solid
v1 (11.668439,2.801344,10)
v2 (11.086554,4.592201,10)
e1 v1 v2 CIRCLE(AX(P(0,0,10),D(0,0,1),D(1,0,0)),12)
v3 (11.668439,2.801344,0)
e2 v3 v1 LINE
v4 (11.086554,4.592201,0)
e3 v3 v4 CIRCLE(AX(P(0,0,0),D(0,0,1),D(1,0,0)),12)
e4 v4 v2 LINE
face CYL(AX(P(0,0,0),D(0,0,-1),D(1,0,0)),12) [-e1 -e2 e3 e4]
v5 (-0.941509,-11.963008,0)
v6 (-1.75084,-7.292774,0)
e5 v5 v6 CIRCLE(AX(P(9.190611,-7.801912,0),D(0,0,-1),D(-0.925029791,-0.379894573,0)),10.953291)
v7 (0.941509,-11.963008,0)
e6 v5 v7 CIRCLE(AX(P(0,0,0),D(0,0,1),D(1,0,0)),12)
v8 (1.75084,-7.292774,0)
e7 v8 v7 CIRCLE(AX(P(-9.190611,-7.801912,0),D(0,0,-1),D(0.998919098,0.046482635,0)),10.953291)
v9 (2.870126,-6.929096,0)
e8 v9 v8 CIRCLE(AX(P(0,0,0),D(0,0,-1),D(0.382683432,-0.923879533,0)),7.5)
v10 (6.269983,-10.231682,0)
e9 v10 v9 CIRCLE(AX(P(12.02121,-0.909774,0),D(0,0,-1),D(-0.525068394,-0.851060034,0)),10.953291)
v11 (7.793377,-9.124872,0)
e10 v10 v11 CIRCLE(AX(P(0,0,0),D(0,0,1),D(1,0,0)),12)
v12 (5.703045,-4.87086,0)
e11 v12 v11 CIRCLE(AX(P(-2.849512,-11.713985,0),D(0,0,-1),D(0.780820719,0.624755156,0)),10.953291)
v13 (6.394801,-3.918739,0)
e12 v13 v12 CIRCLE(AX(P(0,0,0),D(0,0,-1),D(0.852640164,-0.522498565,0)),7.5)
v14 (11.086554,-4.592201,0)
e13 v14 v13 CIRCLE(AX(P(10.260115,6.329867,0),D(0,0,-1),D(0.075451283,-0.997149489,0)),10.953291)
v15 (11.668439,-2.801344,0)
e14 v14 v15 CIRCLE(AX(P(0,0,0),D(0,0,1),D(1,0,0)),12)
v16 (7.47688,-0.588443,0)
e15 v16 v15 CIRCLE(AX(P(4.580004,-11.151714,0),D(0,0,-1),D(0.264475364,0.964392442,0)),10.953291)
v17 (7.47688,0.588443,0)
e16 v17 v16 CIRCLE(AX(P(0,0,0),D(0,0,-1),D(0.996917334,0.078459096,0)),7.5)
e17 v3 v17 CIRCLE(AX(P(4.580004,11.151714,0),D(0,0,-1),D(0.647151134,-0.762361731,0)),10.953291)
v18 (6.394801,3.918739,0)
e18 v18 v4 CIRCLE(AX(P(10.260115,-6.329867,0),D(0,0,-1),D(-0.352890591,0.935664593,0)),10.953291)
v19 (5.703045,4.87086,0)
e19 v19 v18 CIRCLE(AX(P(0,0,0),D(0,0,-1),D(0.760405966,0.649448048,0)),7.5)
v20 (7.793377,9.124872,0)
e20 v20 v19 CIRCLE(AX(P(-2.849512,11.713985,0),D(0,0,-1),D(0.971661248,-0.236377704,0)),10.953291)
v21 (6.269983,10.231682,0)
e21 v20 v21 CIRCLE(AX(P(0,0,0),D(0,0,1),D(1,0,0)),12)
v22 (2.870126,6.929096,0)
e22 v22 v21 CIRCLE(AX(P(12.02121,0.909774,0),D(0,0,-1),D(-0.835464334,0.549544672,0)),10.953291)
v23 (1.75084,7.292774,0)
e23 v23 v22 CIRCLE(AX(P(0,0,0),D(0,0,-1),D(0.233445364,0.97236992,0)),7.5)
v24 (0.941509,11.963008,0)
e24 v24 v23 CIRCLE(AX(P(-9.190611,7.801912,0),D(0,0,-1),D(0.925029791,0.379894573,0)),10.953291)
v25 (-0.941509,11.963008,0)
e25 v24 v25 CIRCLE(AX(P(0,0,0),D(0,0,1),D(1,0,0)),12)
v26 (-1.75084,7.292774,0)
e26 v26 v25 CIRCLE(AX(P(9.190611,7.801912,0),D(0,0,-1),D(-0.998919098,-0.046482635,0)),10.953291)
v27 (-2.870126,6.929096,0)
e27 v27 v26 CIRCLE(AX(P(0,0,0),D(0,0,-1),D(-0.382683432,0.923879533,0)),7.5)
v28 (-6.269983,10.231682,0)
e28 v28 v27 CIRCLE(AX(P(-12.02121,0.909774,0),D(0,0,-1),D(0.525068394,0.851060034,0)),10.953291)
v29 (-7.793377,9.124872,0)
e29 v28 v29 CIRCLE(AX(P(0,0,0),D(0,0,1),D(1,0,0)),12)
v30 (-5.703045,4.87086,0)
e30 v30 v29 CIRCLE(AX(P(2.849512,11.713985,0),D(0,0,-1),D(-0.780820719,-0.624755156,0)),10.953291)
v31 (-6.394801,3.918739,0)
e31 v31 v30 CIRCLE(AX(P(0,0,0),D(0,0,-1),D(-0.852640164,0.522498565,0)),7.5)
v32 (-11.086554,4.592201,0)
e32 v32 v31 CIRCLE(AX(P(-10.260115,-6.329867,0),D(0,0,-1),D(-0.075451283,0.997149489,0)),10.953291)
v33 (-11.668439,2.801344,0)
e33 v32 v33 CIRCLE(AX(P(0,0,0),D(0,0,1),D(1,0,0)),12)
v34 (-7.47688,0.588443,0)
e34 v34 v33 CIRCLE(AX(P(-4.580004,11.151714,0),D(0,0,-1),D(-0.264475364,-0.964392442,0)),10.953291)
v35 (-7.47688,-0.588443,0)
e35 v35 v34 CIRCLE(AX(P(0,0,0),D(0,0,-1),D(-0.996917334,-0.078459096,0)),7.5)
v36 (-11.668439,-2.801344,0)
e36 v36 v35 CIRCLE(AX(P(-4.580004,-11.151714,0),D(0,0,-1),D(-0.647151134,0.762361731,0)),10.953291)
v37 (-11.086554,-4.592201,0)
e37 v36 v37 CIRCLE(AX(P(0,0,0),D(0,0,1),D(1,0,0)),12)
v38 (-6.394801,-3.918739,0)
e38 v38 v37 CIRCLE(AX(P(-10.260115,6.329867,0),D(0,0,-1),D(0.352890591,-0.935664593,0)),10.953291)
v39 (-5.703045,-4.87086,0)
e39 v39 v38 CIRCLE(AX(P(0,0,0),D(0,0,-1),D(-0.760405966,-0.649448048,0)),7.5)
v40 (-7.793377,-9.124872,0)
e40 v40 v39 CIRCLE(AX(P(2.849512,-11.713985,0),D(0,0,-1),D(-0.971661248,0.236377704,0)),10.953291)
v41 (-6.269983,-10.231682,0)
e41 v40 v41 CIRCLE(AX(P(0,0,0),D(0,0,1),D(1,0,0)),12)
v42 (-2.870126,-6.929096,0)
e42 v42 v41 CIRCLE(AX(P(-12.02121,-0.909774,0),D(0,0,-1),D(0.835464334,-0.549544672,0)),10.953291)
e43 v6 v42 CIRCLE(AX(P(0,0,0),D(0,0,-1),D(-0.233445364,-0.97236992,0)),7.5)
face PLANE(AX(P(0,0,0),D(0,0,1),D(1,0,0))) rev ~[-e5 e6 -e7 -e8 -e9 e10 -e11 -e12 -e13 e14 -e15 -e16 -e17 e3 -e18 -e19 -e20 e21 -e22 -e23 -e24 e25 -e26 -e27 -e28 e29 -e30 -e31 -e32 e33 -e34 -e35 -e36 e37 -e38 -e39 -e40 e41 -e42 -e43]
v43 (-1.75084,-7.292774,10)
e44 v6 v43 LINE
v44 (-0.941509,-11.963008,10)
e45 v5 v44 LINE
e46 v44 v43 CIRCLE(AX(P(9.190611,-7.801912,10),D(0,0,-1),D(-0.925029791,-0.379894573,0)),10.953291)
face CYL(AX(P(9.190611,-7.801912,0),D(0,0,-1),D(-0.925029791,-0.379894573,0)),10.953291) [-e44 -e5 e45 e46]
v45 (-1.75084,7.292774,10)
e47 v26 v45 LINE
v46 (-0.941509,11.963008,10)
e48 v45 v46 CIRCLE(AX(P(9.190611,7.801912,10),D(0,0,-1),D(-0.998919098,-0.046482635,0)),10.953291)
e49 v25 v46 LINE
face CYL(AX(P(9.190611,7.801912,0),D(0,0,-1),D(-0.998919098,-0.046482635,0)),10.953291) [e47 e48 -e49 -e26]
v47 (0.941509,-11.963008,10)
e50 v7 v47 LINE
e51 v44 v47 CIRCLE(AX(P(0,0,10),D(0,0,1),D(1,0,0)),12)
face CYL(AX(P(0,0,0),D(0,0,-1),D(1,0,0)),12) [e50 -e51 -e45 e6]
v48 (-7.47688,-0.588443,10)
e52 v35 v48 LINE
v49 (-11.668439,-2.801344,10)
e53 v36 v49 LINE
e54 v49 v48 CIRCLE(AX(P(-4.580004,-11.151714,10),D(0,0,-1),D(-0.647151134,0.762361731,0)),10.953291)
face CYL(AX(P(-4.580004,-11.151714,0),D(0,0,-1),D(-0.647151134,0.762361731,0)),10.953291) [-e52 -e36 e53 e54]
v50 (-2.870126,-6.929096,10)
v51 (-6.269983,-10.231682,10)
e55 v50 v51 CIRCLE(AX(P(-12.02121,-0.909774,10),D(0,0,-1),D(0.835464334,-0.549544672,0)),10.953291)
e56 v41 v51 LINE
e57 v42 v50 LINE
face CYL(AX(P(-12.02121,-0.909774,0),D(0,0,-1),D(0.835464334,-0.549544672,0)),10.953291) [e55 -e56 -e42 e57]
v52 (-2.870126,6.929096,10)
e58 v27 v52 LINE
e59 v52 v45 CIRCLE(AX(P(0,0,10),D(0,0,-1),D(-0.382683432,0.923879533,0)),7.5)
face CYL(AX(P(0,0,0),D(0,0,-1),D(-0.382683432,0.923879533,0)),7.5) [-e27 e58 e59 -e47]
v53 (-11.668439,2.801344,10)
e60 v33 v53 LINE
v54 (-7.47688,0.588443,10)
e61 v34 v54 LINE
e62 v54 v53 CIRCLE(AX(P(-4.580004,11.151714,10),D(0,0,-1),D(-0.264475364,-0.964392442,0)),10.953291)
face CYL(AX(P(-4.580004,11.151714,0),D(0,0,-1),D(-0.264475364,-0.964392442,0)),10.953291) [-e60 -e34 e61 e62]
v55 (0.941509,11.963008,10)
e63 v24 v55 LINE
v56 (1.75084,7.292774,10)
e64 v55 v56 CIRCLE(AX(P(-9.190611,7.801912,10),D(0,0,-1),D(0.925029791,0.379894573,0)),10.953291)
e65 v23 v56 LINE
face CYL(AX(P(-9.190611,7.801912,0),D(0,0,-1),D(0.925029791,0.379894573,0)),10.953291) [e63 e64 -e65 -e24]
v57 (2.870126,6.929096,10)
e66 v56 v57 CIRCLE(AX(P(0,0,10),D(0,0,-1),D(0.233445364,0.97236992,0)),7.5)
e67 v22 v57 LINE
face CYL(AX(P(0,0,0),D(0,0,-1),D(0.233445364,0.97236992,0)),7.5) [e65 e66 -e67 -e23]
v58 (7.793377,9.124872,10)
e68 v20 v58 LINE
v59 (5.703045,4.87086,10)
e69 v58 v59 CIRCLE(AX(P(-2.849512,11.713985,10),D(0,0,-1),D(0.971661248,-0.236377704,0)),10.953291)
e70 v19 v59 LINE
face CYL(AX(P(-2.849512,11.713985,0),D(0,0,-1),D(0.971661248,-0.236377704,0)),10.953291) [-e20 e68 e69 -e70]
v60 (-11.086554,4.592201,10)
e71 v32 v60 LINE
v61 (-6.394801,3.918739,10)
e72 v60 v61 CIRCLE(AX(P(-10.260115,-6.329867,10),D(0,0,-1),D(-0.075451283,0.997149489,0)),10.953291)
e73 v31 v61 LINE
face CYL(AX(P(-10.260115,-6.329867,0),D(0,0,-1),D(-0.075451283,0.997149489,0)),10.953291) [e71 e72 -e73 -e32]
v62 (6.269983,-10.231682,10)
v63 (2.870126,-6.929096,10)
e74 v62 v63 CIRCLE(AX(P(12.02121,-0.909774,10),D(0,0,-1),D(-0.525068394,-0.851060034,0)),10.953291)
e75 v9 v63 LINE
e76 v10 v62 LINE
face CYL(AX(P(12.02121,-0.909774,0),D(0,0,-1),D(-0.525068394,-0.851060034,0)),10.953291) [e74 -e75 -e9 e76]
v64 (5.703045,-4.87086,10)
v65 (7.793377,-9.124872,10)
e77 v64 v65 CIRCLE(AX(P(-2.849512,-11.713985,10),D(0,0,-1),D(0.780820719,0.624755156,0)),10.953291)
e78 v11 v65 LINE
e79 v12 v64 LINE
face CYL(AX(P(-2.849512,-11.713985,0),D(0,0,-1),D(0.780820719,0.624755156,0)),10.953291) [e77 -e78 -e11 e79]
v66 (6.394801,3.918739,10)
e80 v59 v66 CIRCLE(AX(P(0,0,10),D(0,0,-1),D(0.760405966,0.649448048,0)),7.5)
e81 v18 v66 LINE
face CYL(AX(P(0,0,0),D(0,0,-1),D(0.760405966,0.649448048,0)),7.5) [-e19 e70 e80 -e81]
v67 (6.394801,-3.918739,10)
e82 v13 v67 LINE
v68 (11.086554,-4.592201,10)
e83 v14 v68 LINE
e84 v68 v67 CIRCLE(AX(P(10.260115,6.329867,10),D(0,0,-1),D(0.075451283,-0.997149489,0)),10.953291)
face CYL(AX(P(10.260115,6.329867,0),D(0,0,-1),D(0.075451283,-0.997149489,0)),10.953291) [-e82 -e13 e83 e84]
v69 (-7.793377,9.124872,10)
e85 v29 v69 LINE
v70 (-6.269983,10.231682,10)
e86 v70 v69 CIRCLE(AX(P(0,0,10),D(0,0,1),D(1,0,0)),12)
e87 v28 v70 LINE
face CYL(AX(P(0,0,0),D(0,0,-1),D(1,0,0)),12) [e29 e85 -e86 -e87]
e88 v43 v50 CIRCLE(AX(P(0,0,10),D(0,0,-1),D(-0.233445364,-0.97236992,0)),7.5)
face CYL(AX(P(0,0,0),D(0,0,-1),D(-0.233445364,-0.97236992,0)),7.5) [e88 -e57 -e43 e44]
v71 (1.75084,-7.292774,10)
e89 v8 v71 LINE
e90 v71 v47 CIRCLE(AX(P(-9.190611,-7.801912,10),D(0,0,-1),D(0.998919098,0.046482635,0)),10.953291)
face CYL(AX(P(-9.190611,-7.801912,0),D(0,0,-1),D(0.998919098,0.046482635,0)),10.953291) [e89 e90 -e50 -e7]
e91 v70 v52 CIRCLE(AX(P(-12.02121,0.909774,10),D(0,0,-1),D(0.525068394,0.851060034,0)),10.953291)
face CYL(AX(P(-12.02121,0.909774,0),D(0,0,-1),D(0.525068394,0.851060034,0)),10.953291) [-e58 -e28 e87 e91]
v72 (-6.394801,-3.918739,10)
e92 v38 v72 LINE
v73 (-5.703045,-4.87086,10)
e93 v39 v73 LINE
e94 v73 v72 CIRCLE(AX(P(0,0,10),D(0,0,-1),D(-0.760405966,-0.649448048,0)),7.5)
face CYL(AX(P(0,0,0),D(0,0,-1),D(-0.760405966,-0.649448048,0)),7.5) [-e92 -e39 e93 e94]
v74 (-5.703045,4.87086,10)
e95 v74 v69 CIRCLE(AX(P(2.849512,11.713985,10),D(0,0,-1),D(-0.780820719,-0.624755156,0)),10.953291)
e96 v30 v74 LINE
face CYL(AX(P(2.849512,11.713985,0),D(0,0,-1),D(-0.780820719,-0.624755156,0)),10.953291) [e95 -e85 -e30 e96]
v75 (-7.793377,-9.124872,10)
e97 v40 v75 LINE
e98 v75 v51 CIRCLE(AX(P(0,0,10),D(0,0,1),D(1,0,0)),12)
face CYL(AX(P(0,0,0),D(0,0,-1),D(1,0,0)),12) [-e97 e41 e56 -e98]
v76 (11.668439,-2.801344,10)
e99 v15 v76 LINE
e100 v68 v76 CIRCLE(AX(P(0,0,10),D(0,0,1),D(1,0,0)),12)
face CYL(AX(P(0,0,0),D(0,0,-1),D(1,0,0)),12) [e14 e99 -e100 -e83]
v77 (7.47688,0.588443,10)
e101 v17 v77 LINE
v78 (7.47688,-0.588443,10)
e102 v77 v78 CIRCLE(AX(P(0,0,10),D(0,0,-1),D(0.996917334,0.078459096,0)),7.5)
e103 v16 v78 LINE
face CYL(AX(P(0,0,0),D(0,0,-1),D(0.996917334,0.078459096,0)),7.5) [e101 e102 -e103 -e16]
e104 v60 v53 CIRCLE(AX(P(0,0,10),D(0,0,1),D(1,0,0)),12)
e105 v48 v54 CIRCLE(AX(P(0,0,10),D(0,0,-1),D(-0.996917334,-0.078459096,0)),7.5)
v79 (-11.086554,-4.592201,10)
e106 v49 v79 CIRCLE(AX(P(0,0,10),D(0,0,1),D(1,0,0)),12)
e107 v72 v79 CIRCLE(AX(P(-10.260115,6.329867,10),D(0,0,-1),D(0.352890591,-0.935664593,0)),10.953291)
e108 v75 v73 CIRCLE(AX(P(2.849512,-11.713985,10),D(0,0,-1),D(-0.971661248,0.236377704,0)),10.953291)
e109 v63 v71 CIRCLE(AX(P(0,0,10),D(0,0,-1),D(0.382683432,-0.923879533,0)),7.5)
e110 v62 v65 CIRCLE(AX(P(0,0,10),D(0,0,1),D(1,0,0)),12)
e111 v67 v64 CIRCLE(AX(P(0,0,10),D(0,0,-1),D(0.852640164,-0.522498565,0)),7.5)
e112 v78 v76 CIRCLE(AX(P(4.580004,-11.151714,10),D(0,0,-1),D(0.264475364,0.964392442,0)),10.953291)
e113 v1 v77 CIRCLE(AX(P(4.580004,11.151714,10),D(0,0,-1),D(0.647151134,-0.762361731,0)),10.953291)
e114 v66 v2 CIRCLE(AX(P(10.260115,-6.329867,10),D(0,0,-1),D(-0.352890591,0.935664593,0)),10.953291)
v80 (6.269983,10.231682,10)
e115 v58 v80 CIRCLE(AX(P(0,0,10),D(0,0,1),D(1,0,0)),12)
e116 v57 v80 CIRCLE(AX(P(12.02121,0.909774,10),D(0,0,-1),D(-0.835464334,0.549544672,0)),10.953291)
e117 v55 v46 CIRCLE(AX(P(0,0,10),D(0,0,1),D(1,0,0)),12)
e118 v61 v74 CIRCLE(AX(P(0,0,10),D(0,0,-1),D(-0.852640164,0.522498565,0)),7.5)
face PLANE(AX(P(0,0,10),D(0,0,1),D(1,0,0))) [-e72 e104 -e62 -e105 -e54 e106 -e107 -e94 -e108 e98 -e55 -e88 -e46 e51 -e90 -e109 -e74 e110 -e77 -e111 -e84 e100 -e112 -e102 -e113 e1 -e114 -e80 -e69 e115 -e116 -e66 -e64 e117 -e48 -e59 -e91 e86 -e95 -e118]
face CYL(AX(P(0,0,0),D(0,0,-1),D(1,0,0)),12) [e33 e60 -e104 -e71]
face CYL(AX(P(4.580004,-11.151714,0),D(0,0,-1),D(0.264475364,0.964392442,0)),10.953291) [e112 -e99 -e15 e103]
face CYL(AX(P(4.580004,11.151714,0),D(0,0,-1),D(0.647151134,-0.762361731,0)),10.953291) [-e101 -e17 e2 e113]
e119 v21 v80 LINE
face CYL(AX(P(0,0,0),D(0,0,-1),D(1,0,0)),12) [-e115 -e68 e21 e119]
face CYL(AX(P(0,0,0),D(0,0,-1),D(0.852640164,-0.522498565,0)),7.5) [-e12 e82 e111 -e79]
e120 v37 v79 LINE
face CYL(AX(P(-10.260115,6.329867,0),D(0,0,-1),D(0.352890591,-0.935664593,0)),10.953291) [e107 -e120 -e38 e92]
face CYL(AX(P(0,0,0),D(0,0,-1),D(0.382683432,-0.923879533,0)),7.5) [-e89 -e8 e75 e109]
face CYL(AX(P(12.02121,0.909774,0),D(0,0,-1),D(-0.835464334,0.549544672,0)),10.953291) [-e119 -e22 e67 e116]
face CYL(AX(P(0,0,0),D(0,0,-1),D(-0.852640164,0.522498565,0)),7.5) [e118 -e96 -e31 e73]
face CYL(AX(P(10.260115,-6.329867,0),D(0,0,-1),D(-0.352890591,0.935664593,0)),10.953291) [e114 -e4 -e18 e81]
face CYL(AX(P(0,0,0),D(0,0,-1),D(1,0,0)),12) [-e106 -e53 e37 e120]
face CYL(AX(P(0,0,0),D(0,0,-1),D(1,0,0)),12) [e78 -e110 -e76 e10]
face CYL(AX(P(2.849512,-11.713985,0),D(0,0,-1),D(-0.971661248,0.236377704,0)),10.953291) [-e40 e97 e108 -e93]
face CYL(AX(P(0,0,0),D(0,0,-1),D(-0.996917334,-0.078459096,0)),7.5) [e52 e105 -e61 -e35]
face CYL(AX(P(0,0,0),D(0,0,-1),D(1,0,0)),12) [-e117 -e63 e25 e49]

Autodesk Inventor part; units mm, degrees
sketch "Sketch1" plane through (0, 0, 0) normal (0, 0, 1) x (1, 0, 0)
  circle A0 centre (0, 0) radius 12
  dimension "d0" = 24
extrude "Extrusion1" add sketch "Sketch1" along normal blind 10
ref_plane "Work Plane2" through (0, 0, 5) normal (0, 0, 1) x (1, 0, 0)
sketch "Sketch2" plane through (0, 0, 0) normal (0, 0, -1) x (-1, 0, 0)
  circle A0 centre (0, 0) radius 12 projected
  circle A1 centre (0, 0) radius 10
  dimension "d3" = 20
surface extrude "Pitch Diameter" sketch "Sketch2" against normal through all shown no curves A1
ref_plane "Work Plane8" through (0, 0, 0) normal (0.9510565, 0.309017, 0) x (0, 0, 1)
ref_plane "Work Plane9" through (0, 0, 0) normal (1, 0, 0) x (0, 1, 0)
spur gear teeth "Spur Gear" teeth 10 pitch diameter 20 tip diameter 24 root diameter 15 face width 10 start plane through (0, 0, 0) normal (0, 0, -1) x (-1, 0, 0)
equation "\"d0\" = da_da"
equation "\"d1\" = da_b"
equation "\"d3\" = da_d"
equation "\"da_da\" = 24"
equation "\"da_b\" = 10"
equation "\"da_d\" = 20"
properties part number "Spur Gear1" material "Steel"
